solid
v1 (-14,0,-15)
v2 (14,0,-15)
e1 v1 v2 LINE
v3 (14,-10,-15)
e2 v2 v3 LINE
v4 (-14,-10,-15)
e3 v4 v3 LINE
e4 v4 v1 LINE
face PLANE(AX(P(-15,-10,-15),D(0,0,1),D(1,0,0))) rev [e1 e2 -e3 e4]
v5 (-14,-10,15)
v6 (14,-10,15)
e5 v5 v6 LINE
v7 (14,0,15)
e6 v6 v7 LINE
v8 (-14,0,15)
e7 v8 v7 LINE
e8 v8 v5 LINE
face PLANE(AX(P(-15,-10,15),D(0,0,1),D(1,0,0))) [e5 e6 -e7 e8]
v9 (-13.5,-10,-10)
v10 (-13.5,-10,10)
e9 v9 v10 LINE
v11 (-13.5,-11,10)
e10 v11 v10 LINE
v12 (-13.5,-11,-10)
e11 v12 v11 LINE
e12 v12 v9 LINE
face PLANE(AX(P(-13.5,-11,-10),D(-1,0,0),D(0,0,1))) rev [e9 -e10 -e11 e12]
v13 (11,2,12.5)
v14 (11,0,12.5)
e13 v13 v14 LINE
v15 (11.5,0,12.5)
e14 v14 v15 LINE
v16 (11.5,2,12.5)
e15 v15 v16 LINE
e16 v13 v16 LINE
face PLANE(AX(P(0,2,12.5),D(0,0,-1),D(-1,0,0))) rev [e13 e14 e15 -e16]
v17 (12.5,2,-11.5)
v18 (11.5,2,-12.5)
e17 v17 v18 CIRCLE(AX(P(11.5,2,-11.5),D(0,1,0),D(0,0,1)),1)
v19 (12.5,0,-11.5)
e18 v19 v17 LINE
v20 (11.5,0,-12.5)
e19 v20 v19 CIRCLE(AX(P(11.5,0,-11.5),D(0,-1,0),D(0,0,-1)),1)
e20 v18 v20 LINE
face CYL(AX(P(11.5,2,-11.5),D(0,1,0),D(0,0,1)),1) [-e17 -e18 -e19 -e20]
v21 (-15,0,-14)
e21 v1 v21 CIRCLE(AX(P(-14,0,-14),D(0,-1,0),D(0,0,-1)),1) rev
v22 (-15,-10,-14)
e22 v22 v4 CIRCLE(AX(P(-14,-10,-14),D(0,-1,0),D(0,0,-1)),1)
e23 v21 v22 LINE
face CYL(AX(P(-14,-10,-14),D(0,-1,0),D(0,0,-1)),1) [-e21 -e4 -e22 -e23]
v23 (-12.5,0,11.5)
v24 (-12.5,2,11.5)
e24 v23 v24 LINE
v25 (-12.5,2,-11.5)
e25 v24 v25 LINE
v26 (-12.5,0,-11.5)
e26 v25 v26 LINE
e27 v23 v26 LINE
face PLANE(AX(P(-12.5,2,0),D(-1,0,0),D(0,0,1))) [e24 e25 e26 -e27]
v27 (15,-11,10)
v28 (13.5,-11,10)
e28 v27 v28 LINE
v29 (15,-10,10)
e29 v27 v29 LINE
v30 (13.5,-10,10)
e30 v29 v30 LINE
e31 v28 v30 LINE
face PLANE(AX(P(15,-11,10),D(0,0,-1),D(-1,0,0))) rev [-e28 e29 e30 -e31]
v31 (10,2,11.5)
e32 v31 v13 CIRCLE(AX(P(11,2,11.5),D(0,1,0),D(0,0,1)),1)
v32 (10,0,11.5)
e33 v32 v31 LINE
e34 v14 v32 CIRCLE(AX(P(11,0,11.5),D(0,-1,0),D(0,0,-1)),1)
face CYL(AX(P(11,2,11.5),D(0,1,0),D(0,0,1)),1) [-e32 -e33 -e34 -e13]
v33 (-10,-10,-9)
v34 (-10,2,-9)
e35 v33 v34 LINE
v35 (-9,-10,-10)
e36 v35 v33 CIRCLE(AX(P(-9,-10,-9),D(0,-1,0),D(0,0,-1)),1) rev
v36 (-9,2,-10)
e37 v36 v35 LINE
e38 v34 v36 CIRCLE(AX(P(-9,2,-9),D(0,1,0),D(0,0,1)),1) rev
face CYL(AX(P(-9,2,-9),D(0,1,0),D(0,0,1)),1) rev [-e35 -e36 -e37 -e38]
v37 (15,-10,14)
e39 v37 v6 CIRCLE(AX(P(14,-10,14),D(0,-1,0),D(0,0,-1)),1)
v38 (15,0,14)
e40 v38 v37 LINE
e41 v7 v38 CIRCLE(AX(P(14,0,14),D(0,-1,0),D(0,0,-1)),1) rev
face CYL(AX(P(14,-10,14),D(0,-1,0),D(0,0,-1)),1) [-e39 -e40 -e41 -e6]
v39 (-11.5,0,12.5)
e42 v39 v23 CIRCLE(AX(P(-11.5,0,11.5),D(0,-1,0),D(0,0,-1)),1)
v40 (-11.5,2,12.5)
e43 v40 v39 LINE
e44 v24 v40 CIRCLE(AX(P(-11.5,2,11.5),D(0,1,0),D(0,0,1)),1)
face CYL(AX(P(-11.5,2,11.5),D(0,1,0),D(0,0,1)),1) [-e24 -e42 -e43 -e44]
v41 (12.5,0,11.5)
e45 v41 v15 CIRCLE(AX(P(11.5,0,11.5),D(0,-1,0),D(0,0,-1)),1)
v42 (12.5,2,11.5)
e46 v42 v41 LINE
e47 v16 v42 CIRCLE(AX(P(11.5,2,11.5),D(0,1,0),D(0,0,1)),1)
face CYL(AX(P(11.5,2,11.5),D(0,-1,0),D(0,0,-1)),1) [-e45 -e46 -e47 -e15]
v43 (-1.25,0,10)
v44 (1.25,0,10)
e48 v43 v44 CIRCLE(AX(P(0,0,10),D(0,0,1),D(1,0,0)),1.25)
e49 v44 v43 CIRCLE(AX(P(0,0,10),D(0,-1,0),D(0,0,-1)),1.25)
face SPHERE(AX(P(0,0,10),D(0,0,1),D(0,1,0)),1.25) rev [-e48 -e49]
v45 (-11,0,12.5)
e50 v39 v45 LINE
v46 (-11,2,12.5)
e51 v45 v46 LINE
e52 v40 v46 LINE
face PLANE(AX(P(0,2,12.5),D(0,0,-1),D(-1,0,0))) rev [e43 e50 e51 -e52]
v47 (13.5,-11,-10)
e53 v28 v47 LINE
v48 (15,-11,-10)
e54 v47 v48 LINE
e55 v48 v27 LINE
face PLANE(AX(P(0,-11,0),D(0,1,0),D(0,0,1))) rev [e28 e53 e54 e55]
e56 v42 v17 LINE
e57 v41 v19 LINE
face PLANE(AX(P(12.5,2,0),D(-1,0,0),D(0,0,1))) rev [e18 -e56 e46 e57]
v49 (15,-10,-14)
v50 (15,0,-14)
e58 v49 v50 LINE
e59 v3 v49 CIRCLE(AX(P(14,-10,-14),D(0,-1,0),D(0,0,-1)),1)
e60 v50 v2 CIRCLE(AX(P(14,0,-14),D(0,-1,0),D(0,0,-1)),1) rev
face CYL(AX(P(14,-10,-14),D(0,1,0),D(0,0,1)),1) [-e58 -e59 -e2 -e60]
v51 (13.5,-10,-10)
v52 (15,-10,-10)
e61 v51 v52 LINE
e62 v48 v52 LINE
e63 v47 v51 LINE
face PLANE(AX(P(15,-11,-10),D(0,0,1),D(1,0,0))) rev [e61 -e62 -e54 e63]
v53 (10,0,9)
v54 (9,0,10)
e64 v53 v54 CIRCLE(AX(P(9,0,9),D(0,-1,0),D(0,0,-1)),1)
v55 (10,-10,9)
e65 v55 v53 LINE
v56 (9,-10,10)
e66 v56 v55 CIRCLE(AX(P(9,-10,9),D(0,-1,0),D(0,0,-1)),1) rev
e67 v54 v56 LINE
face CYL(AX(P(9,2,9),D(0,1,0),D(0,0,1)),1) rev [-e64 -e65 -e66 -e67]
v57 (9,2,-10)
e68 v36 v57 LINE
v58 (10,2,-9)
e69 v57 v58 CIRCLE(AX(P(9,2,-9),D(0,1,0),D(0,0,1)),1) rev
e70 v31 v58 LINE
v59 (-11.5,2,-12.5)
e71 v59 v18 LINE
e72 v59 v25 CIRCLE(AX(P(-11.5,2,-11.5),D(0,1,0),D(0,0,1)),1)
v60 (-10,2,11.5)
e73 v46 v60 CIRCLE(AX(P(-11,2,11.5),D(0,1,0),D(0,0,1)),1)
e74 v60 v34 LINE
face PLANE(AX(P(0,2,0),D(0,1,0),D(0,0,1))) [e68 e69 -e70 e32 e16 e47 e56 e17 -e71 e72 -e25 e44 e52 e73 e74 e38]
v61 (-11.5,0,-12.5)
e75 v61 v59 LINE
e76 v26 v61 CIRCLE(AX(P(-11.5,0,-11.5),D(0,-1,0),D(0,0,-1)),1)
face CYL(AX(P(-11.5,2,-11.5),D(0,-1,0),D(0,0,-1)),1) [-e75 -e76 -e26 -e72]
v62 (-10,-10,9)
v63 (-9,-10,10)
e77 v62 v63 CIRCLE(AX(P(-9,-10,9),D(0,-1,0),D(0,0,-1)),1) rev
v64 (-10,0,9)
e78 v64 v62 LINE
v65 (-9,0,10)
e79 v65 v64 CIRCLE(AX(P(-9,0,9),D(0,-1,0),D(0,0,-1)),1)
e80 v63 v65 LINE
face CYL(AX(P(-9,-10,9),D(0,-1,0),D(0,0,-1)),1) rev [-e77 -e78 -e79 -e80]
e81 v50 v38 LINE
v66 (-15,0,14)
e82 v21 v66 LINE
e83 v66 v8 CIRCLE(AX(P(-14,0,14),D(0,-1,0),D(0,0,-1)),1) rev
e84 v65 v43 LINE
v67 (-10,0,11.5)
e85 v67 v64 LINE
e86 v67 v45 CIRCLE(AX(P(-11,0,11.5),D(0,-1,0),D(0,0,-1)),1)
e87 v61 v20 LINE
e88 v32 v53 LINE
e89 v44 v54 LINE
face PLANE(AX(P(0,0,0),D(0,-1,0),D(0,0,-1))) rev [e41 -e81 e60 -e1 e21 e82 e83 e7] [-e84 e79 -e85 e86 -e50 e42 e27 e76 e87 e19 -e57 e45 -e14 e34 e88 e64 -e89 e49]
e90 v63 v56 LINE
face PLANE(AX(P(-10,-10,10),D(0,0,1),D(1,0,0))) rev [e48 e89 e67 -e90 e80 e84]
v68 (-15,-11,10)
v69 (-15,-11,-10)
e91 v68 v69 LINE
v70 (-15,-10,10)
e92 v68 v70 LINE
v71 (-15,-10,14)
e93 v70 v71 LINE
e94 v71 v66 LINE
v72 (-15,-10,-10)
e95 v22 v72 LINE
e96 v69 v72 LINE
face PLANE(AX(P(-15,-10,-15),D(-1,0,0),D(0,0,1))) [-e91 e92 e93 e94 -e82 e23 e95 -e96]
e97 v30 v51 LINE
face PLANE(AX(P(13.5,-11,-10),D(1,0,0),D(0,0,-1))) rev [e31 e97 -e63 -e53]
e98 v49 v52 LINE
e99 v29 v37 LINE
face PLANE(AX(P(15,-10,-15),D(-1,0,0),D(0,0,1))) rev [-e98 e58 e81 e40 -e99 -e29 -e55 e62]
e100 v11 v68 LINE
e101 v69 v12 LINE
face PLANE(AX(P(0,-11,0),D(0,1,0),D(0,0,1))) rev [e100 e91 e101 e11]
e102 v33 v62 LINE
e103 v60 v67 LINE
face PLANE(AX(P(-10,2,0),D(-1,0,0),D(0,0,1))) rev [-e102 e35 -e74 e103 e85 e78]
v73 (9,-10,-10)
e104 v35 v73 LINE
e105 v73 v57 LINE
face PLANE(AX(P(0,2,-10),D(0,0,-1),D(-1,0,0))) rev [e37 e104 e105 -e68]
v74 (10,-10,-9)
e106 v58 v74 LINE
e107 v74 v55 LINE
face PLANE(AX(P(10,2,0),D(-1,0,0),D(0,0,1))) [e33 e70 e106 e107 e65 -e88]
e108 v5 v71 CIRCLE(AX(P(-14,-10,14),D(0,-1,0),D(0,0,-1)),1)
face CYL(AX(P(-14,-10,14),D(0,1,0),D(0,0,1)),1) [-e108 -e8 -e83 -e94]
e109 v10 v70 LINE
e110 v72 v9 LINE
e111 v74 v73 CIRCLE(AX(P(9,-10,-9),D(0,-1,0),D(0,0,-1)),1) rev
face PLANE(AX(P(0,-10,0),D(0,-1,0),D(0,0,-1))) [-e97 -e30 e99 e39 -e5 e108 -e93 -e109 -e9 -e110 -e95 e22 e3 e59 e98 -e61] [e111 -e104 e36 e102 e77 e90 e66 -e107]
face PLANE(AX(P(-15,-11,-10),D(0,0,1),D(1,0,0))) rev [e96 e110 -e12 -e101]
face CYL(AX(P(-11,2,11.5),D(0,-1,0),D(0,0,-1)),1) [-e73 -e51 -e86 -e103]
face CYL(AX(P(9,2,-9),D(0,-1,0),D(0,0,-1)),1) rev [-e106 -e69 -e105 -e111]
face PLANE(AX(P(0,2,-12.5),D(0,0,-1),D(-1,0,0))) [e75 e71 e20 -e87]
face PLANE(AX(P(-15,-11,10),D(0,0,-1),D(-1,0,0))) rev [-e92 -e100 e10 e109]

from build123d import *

# Parameters (mm, degrees)
BOSS_EXTRUDE1_DEPTH = 2
SKETCH3_W           = 30
SKETCH3_H           = 30
SKETCH3_W_2         = 20
SKETCH3_H_2         = 20
BOSS_EXTRUDE2_DEPTH = 10
SKETCH4_W           = 1.5
SKETCH4_H           = 20
BOSS_EXTRUDE3_DEPTH = 1
FILLET2_R           = 1


with BuildPart() as part:
    # Sketch1 → Boss-Extrude1 (new body)
    with BuildSketch(Plane(origin=(0, 0, 0), x_dir=(1, 0, 0), z_dir=(0, 1, 0))):
        Polygon((-12.5, 12.5), (-12.5, -12.5), (-10, -12.5), (-10, 10), (10, 10), (10, -12.5), (12.5, -12.5), (12.5, 12.5), align=None)
    extrude(amount=BOSS_EXTRUDE1_DEPTH)

    # Sketch3 → Boss-Extrude2 (add)
    with BuildSketch(Plane.XZ):
        Rectangle(SKETCH3_W, SKETCH3_H)
        Rectangle(SKETCH3_W_2, SKETCH3_H_2, mode=Mode.SUBTRACT)
    extrude(amount=BOSS_EXTRUDE2_DEPTH)

    # Sketch4 → Boss-Extrude3 (add)
    with BuildSketch(Plane.XZ.offset(10)):
        with Locations((-14.25, 0)):
            Rectangle(SKETCH4_W, SKETCH4_H)
        with Locations((14.25, 0)):
            Rectangle(SKETCH4_W, SKETCH4_H)
    extrude(amount=BOSS_EXTRUDE3_DEPTH)

    # Sketch5 → Cut-Revolve4 (revolve, cut)
    with BuildSketch(Plane(origin=(0, 0, 0), x_dir=(0, 0, -1), z_dir=(1, 0, 0))):
        with BuildLine():
            Line((-8.75, 0), (-11.25, 0))
            ThreePointArc((-11.25, 0), (-10, -1.25), (-8.75, 0))
        make_face()
    revolve(axis=Axis((0, 0, 1000), (0, 0, -1)), mode=Mode.SUBTRACT)

    # Fillet2
    fillet2_edges = [part.edges().sort_by_distance(p)[0] for p in [
        (-15, -5, 15),
        (15, -5, 15),
        (15, -5, -15),
        (-15, -5, -15),
        (-10, -4, -10),
        (-10, -5, 10),
        (10, -5, 10),
        (10, -4, -10),
        (-10, 1, 12.5),
        (12.5, 1, -12.5),
        (12.5, 1, 12.5),
        (10, 1, 12.5),
        (-12.5, 1, 12.5),
        (-12.5, 1, -12.5),
    ]]
    fillet(fillet2_edges, radius=FILLET2_R)


solid = part.part
